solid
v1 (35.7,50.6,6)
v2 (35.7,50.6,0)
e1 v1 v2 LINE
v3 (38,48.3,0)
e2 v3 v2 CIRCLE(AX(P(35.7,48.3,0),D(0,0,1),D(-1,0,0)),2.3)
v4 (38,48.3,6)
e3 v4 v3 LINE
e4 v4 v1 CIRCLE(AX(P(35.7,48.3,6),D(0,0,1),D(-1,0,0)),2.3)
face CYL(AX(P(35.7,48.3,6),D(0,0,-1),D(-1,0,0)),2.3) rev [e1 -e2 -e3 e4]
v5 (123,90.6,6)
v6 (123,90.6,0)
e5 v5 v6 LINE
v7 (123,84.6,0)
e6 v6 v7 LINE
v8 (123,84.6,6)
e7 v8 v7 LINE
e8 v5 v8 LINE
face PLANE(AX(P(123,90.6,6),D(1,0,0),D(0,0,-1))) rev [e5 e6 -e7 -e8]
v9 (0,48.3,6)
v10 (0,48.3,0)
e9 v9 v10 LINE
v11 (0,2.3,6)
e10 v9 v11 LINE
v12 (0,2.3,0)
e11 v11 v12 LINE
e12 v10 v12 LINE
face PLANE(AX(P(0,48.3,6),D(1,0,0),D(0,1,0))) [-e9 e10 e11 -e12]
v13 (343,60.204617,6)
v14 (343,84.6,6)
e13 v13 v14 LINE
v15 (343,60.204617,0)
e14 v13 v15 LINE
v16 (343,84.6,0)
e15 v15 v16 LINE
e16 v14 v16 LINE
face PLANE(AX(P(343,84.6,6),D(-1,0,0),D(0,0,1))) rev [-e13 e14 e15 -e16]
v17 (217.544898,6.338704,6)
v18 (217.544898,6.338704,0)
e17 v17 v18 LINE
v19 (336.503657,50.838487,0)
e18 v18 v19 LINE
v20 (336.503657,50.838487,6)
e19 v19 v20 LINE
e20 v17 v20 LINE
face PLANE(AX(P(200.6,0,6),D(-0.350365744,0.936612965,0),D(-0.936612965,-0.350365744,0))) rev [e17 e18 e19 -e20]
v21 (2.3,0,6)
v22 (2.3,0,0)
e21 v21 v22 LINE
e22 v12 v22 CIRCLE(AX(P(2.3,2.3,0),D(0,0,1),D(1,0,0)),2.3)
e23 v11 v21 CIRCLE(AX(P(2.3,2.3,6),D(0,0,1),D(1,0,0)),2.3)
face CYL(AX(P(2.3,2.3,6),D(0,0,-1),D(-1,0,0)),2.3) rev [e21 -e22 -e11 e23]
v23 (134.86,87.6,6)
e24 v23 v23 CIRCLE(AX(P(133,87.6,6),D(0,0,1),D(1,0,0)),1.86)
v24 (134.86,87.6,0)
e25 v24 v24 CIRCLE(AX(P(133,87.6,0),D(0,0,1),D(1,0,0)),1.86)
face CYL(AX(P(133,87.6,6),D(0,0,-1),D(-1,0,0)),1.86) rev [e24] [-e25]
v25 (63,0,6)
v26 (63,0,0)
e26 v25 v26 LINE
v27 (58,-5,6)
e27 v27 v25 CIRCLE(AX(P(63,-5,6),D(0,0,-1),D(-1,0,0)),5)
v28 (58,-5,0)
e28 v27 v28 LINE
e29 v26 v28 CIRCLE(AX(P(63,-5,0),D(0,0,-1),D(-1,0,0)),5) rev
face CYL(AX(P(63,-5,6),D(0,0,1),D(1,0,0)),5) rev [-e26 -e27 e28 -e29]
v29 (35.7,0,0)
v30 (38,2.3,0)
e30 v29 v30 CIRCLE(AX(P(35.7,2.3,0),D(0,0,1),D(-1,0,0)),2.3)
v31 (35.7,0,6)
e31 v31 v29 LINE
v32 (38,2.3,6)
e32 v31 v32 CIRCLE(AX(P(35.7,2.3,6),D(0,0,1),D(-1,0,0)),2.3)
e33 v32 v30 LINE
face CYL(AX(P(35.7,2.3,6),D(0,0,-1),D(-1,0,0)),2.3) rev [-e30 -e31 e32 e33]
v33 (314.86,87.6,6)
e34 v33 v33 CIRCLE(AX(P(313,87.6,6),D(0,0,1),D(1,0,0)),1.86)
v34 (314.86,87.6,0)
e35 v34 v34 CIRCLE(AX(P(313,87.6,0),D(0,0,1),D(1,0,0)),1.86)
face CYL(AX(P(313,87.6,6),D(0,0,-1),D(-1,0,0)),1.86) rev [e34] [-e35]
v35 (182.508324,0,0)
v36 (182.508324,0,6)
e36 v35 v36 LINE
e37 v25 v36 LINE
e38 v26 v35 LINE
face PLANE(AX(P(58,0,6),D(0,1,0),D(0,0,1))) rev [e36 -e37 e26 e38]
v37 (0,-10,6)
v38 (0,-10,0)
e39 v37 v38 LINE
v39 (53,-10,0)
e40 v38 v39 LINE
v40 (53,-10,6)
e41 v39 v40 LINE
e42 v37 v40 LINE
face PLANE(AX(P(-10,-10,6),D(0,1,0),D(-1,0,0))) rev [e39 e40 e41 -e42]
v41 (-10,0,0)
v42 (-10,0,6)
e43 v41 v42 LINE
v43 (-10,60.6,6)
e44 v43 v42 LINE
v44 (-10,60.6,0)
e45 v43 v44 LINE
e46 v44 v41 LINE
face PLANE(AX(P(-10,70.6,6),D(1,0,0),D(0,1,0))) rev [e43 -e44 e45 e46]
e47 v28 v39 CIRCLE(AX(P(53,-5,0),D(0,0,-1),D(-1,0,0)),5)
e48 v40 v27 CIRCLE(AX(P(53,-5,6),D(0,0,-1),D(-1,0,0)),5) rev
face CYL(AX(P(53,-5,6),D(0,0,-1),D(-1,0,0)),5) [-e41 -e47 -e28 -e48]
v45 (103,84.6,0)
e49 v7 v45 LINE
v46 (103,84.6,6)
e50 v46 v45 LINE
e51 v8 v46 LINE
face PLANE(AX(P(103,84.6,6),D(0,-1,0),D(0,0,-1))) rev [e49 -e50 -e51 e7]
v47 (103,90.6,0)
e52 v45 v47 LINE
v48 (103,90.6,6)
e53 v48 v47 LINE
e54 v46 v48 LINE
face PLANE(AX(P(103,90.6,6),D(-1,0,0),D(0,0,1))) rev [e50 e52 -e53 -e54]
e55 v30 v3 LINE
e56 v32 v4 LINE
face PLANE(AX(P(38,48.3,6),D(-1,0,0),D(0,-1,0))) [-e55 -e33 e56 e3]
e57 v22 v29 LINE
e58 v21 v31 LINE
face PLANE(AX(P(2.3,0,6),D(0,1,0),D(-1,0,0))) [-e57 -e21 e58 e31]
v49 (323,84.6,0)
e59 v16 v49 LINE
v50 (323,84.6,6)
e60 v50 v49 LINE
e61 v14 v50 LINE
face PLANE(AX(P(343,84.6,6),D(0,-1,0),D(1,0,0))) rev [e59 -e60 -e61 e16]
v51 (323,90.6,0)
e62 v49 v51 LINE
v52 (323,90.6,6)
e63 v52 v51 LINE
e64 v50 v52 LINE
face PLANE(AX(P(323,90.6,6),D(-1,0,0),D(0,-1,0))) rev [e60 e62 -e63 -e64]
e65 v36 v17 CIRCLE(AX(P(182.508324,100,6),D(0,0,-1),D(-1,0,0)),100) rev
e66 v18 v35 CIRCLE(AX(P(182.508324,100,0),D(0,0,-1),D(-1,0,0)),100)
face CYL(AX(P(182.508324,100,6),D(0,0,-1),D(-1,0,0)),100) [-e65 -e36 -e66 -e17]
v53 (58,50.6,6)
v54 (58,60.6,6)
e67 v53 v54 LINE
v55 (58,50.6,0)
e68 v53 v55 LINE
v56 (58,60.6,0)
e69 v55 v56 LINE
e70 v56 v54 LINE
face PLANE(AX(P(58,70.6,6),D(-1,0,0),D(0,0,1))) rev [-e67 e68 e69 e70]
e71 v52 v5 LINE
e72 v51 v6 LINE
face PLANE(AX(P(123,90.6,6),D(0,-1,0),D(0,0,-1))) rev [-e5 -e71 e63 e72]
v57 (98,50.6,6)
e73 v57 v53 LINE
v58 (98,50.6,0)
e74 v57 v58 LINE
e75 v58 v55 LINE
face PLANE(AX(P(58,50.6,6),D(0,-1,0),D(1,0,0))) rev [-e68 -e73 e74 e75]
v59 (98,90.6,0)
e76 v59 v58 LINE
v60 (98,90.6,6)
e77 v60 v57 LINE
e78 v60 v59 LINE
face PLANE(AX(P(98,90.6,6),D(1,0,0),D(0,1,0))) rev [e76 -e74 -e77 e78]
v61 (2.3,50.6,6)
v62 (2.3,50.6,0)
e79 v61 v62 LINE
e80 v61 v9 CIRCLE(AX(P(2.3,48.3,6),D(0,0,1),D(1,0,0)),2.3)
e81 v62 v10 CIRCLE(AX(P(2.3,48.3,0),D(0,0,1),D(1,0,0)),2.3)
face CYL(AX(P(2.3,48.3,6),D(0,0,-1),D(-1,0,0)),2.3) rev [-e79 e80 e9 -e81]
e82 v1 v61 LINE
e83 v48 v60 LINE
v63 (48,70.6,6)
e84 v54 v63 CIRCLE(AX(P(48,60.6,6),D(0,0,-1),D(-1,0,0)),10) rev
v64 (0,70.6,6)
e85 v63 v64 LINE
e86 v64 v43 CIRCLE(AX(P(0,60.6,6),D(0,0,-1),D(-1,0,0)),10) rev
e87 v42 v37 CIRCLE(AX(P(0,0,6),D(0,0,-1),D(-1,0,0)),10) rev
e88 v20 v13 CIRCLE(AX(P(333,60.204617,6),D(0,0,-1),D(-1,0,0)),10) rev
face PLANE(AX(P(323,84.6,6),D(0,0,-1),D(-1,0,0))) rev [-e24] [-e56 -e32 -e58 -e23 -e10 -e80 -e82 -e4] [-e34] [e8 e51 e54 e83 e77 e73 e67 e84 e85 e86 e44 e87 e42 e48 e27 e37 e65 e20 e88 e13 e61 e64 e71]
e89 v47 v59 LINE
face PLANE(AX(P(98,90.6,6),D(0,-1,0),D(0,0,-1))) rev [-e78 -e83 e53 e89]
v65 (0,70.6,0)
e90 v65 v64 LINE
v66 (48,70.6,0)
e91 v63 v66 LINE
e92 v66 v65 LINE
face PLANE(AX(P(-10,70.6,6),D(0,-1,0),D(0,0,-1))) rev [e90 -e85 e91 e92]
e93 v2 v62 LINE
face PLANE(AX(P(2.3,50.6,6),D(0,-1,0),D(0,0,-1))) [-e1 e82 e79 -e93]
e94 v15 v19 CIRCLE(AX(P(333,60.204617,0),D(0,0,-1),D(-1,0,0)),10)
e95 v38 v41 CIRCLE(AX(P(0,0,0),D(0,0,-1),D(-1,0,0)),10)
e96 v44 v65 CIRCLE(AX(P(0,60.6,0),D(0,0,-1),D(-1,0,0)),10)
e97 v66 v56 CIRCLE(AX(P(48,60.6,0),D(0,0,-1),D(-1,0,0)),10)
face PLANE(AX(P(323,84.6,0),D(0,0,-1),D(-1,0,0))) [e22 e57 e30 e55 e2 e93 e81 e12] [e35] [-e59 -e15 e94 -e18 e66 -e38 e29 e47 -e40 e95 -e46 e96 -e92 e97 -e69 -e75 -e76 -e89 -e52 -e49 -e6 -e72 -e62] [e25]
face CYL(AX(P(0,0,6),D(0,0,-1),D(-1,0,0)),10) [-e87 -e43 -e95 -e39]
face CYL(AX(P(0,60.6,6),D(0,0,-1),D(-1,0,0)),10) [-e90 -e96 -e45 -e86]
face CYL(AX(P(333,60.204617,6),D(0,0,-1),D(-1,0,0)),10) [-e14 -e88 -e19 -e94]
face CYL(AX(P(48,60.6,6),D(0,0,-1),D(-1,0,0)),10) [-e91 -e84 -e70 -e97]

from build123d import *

# Parameters (mm, degrees)
SKETCH1_R      = 1.86
EXTRUDE1_DEPTH = 6
FILLET1_R      = 10
FILLET2_R      = 5
FILLET4_R      = 100


with BuildPart() as part:
    # Sketch1 → Extrude1 (new body)
    with BuildSketch(Plane.XY):
        Polygon((58, 0), (58, -10), (-10, -10), (-10, 70.6), (58, 70.6), (58, 58.440884087), (58, 50.6), (98, 50.6), (98, 90.6), (103, 90.6), (103, 84.6), (123, 84.6), (123, 90.6), (323, 90.6), (323, 84.6), (343, 84.6), (343, 53.268621992), (200.6, 0), align=None)
        with Locations((313, 87.6)):
            Circle(SKETCH1_R, mode=Mode.SUBTRACT)
        with Locations((133, 87.6)):
            Circle(SKETCH1_R, mode=Mode.SUBTRACT)
        with BuildLine():
            Line((2.3, 50.6), (35.7, 50.6))
            ThreePointArc((35.7, 50.6), (37.326345597, 49.926345597), (38, 48.3))
            Line((38, 48.3), (38, 2.3))
            ThreePointArc((38, 2.3), (37.326345597, 0.673654403), (35.7, 0))
            Line((35.7, 0), (2.3, 0))
            ThreePointArc((2.3, 0), (0.673654403, 0.673654403), (0, 2.3))
            Line((0, 2.3), (0, 48.3))
            ThreePointArc((0, 48.3), (0.673654403, 49.926345597), (2.3, 50.6))
        make_face(mode=Mode.SUBTRACT)
    extrude(amount=EXTRUDE1_DEPTH)

    # Fillet1
    fillet1_edges = [part.edges().sort_by_distance(p)[0] for p in [
        (343, 53.268621992, 3),
        (-10, -10, 3),
        (-10, 70.6, 3),
        (58, 70.6, 3),
    ]]
    fillet(fillet1_edges, radius=FILLET1_R)

    # Fillet2
    fillet2_edges = [part.edges().sort_by_distance(p)[0] for p in [
        (58, 0, 3),
    ]]
    fillet(fillet2_edges, radius=FILLET2_R)
    fillet2_2_edges = [part.edges().sort_by_distance(p)[0] for p in [
        (58, -10, 3),
    ]]
    fillet(fillet2_2_edges, radius=FILLET2_R - 0.0001)  # a hair under: the kernel refuses the full size

    # Fillet4
    fillet4_edges = [part.edges().sort_by_distance(p)[0] for p in [
        (200.6, 0, 3),
    ]]
    fillet(fillet4_edges, radius=FILLET4_R)


solid = part.part
